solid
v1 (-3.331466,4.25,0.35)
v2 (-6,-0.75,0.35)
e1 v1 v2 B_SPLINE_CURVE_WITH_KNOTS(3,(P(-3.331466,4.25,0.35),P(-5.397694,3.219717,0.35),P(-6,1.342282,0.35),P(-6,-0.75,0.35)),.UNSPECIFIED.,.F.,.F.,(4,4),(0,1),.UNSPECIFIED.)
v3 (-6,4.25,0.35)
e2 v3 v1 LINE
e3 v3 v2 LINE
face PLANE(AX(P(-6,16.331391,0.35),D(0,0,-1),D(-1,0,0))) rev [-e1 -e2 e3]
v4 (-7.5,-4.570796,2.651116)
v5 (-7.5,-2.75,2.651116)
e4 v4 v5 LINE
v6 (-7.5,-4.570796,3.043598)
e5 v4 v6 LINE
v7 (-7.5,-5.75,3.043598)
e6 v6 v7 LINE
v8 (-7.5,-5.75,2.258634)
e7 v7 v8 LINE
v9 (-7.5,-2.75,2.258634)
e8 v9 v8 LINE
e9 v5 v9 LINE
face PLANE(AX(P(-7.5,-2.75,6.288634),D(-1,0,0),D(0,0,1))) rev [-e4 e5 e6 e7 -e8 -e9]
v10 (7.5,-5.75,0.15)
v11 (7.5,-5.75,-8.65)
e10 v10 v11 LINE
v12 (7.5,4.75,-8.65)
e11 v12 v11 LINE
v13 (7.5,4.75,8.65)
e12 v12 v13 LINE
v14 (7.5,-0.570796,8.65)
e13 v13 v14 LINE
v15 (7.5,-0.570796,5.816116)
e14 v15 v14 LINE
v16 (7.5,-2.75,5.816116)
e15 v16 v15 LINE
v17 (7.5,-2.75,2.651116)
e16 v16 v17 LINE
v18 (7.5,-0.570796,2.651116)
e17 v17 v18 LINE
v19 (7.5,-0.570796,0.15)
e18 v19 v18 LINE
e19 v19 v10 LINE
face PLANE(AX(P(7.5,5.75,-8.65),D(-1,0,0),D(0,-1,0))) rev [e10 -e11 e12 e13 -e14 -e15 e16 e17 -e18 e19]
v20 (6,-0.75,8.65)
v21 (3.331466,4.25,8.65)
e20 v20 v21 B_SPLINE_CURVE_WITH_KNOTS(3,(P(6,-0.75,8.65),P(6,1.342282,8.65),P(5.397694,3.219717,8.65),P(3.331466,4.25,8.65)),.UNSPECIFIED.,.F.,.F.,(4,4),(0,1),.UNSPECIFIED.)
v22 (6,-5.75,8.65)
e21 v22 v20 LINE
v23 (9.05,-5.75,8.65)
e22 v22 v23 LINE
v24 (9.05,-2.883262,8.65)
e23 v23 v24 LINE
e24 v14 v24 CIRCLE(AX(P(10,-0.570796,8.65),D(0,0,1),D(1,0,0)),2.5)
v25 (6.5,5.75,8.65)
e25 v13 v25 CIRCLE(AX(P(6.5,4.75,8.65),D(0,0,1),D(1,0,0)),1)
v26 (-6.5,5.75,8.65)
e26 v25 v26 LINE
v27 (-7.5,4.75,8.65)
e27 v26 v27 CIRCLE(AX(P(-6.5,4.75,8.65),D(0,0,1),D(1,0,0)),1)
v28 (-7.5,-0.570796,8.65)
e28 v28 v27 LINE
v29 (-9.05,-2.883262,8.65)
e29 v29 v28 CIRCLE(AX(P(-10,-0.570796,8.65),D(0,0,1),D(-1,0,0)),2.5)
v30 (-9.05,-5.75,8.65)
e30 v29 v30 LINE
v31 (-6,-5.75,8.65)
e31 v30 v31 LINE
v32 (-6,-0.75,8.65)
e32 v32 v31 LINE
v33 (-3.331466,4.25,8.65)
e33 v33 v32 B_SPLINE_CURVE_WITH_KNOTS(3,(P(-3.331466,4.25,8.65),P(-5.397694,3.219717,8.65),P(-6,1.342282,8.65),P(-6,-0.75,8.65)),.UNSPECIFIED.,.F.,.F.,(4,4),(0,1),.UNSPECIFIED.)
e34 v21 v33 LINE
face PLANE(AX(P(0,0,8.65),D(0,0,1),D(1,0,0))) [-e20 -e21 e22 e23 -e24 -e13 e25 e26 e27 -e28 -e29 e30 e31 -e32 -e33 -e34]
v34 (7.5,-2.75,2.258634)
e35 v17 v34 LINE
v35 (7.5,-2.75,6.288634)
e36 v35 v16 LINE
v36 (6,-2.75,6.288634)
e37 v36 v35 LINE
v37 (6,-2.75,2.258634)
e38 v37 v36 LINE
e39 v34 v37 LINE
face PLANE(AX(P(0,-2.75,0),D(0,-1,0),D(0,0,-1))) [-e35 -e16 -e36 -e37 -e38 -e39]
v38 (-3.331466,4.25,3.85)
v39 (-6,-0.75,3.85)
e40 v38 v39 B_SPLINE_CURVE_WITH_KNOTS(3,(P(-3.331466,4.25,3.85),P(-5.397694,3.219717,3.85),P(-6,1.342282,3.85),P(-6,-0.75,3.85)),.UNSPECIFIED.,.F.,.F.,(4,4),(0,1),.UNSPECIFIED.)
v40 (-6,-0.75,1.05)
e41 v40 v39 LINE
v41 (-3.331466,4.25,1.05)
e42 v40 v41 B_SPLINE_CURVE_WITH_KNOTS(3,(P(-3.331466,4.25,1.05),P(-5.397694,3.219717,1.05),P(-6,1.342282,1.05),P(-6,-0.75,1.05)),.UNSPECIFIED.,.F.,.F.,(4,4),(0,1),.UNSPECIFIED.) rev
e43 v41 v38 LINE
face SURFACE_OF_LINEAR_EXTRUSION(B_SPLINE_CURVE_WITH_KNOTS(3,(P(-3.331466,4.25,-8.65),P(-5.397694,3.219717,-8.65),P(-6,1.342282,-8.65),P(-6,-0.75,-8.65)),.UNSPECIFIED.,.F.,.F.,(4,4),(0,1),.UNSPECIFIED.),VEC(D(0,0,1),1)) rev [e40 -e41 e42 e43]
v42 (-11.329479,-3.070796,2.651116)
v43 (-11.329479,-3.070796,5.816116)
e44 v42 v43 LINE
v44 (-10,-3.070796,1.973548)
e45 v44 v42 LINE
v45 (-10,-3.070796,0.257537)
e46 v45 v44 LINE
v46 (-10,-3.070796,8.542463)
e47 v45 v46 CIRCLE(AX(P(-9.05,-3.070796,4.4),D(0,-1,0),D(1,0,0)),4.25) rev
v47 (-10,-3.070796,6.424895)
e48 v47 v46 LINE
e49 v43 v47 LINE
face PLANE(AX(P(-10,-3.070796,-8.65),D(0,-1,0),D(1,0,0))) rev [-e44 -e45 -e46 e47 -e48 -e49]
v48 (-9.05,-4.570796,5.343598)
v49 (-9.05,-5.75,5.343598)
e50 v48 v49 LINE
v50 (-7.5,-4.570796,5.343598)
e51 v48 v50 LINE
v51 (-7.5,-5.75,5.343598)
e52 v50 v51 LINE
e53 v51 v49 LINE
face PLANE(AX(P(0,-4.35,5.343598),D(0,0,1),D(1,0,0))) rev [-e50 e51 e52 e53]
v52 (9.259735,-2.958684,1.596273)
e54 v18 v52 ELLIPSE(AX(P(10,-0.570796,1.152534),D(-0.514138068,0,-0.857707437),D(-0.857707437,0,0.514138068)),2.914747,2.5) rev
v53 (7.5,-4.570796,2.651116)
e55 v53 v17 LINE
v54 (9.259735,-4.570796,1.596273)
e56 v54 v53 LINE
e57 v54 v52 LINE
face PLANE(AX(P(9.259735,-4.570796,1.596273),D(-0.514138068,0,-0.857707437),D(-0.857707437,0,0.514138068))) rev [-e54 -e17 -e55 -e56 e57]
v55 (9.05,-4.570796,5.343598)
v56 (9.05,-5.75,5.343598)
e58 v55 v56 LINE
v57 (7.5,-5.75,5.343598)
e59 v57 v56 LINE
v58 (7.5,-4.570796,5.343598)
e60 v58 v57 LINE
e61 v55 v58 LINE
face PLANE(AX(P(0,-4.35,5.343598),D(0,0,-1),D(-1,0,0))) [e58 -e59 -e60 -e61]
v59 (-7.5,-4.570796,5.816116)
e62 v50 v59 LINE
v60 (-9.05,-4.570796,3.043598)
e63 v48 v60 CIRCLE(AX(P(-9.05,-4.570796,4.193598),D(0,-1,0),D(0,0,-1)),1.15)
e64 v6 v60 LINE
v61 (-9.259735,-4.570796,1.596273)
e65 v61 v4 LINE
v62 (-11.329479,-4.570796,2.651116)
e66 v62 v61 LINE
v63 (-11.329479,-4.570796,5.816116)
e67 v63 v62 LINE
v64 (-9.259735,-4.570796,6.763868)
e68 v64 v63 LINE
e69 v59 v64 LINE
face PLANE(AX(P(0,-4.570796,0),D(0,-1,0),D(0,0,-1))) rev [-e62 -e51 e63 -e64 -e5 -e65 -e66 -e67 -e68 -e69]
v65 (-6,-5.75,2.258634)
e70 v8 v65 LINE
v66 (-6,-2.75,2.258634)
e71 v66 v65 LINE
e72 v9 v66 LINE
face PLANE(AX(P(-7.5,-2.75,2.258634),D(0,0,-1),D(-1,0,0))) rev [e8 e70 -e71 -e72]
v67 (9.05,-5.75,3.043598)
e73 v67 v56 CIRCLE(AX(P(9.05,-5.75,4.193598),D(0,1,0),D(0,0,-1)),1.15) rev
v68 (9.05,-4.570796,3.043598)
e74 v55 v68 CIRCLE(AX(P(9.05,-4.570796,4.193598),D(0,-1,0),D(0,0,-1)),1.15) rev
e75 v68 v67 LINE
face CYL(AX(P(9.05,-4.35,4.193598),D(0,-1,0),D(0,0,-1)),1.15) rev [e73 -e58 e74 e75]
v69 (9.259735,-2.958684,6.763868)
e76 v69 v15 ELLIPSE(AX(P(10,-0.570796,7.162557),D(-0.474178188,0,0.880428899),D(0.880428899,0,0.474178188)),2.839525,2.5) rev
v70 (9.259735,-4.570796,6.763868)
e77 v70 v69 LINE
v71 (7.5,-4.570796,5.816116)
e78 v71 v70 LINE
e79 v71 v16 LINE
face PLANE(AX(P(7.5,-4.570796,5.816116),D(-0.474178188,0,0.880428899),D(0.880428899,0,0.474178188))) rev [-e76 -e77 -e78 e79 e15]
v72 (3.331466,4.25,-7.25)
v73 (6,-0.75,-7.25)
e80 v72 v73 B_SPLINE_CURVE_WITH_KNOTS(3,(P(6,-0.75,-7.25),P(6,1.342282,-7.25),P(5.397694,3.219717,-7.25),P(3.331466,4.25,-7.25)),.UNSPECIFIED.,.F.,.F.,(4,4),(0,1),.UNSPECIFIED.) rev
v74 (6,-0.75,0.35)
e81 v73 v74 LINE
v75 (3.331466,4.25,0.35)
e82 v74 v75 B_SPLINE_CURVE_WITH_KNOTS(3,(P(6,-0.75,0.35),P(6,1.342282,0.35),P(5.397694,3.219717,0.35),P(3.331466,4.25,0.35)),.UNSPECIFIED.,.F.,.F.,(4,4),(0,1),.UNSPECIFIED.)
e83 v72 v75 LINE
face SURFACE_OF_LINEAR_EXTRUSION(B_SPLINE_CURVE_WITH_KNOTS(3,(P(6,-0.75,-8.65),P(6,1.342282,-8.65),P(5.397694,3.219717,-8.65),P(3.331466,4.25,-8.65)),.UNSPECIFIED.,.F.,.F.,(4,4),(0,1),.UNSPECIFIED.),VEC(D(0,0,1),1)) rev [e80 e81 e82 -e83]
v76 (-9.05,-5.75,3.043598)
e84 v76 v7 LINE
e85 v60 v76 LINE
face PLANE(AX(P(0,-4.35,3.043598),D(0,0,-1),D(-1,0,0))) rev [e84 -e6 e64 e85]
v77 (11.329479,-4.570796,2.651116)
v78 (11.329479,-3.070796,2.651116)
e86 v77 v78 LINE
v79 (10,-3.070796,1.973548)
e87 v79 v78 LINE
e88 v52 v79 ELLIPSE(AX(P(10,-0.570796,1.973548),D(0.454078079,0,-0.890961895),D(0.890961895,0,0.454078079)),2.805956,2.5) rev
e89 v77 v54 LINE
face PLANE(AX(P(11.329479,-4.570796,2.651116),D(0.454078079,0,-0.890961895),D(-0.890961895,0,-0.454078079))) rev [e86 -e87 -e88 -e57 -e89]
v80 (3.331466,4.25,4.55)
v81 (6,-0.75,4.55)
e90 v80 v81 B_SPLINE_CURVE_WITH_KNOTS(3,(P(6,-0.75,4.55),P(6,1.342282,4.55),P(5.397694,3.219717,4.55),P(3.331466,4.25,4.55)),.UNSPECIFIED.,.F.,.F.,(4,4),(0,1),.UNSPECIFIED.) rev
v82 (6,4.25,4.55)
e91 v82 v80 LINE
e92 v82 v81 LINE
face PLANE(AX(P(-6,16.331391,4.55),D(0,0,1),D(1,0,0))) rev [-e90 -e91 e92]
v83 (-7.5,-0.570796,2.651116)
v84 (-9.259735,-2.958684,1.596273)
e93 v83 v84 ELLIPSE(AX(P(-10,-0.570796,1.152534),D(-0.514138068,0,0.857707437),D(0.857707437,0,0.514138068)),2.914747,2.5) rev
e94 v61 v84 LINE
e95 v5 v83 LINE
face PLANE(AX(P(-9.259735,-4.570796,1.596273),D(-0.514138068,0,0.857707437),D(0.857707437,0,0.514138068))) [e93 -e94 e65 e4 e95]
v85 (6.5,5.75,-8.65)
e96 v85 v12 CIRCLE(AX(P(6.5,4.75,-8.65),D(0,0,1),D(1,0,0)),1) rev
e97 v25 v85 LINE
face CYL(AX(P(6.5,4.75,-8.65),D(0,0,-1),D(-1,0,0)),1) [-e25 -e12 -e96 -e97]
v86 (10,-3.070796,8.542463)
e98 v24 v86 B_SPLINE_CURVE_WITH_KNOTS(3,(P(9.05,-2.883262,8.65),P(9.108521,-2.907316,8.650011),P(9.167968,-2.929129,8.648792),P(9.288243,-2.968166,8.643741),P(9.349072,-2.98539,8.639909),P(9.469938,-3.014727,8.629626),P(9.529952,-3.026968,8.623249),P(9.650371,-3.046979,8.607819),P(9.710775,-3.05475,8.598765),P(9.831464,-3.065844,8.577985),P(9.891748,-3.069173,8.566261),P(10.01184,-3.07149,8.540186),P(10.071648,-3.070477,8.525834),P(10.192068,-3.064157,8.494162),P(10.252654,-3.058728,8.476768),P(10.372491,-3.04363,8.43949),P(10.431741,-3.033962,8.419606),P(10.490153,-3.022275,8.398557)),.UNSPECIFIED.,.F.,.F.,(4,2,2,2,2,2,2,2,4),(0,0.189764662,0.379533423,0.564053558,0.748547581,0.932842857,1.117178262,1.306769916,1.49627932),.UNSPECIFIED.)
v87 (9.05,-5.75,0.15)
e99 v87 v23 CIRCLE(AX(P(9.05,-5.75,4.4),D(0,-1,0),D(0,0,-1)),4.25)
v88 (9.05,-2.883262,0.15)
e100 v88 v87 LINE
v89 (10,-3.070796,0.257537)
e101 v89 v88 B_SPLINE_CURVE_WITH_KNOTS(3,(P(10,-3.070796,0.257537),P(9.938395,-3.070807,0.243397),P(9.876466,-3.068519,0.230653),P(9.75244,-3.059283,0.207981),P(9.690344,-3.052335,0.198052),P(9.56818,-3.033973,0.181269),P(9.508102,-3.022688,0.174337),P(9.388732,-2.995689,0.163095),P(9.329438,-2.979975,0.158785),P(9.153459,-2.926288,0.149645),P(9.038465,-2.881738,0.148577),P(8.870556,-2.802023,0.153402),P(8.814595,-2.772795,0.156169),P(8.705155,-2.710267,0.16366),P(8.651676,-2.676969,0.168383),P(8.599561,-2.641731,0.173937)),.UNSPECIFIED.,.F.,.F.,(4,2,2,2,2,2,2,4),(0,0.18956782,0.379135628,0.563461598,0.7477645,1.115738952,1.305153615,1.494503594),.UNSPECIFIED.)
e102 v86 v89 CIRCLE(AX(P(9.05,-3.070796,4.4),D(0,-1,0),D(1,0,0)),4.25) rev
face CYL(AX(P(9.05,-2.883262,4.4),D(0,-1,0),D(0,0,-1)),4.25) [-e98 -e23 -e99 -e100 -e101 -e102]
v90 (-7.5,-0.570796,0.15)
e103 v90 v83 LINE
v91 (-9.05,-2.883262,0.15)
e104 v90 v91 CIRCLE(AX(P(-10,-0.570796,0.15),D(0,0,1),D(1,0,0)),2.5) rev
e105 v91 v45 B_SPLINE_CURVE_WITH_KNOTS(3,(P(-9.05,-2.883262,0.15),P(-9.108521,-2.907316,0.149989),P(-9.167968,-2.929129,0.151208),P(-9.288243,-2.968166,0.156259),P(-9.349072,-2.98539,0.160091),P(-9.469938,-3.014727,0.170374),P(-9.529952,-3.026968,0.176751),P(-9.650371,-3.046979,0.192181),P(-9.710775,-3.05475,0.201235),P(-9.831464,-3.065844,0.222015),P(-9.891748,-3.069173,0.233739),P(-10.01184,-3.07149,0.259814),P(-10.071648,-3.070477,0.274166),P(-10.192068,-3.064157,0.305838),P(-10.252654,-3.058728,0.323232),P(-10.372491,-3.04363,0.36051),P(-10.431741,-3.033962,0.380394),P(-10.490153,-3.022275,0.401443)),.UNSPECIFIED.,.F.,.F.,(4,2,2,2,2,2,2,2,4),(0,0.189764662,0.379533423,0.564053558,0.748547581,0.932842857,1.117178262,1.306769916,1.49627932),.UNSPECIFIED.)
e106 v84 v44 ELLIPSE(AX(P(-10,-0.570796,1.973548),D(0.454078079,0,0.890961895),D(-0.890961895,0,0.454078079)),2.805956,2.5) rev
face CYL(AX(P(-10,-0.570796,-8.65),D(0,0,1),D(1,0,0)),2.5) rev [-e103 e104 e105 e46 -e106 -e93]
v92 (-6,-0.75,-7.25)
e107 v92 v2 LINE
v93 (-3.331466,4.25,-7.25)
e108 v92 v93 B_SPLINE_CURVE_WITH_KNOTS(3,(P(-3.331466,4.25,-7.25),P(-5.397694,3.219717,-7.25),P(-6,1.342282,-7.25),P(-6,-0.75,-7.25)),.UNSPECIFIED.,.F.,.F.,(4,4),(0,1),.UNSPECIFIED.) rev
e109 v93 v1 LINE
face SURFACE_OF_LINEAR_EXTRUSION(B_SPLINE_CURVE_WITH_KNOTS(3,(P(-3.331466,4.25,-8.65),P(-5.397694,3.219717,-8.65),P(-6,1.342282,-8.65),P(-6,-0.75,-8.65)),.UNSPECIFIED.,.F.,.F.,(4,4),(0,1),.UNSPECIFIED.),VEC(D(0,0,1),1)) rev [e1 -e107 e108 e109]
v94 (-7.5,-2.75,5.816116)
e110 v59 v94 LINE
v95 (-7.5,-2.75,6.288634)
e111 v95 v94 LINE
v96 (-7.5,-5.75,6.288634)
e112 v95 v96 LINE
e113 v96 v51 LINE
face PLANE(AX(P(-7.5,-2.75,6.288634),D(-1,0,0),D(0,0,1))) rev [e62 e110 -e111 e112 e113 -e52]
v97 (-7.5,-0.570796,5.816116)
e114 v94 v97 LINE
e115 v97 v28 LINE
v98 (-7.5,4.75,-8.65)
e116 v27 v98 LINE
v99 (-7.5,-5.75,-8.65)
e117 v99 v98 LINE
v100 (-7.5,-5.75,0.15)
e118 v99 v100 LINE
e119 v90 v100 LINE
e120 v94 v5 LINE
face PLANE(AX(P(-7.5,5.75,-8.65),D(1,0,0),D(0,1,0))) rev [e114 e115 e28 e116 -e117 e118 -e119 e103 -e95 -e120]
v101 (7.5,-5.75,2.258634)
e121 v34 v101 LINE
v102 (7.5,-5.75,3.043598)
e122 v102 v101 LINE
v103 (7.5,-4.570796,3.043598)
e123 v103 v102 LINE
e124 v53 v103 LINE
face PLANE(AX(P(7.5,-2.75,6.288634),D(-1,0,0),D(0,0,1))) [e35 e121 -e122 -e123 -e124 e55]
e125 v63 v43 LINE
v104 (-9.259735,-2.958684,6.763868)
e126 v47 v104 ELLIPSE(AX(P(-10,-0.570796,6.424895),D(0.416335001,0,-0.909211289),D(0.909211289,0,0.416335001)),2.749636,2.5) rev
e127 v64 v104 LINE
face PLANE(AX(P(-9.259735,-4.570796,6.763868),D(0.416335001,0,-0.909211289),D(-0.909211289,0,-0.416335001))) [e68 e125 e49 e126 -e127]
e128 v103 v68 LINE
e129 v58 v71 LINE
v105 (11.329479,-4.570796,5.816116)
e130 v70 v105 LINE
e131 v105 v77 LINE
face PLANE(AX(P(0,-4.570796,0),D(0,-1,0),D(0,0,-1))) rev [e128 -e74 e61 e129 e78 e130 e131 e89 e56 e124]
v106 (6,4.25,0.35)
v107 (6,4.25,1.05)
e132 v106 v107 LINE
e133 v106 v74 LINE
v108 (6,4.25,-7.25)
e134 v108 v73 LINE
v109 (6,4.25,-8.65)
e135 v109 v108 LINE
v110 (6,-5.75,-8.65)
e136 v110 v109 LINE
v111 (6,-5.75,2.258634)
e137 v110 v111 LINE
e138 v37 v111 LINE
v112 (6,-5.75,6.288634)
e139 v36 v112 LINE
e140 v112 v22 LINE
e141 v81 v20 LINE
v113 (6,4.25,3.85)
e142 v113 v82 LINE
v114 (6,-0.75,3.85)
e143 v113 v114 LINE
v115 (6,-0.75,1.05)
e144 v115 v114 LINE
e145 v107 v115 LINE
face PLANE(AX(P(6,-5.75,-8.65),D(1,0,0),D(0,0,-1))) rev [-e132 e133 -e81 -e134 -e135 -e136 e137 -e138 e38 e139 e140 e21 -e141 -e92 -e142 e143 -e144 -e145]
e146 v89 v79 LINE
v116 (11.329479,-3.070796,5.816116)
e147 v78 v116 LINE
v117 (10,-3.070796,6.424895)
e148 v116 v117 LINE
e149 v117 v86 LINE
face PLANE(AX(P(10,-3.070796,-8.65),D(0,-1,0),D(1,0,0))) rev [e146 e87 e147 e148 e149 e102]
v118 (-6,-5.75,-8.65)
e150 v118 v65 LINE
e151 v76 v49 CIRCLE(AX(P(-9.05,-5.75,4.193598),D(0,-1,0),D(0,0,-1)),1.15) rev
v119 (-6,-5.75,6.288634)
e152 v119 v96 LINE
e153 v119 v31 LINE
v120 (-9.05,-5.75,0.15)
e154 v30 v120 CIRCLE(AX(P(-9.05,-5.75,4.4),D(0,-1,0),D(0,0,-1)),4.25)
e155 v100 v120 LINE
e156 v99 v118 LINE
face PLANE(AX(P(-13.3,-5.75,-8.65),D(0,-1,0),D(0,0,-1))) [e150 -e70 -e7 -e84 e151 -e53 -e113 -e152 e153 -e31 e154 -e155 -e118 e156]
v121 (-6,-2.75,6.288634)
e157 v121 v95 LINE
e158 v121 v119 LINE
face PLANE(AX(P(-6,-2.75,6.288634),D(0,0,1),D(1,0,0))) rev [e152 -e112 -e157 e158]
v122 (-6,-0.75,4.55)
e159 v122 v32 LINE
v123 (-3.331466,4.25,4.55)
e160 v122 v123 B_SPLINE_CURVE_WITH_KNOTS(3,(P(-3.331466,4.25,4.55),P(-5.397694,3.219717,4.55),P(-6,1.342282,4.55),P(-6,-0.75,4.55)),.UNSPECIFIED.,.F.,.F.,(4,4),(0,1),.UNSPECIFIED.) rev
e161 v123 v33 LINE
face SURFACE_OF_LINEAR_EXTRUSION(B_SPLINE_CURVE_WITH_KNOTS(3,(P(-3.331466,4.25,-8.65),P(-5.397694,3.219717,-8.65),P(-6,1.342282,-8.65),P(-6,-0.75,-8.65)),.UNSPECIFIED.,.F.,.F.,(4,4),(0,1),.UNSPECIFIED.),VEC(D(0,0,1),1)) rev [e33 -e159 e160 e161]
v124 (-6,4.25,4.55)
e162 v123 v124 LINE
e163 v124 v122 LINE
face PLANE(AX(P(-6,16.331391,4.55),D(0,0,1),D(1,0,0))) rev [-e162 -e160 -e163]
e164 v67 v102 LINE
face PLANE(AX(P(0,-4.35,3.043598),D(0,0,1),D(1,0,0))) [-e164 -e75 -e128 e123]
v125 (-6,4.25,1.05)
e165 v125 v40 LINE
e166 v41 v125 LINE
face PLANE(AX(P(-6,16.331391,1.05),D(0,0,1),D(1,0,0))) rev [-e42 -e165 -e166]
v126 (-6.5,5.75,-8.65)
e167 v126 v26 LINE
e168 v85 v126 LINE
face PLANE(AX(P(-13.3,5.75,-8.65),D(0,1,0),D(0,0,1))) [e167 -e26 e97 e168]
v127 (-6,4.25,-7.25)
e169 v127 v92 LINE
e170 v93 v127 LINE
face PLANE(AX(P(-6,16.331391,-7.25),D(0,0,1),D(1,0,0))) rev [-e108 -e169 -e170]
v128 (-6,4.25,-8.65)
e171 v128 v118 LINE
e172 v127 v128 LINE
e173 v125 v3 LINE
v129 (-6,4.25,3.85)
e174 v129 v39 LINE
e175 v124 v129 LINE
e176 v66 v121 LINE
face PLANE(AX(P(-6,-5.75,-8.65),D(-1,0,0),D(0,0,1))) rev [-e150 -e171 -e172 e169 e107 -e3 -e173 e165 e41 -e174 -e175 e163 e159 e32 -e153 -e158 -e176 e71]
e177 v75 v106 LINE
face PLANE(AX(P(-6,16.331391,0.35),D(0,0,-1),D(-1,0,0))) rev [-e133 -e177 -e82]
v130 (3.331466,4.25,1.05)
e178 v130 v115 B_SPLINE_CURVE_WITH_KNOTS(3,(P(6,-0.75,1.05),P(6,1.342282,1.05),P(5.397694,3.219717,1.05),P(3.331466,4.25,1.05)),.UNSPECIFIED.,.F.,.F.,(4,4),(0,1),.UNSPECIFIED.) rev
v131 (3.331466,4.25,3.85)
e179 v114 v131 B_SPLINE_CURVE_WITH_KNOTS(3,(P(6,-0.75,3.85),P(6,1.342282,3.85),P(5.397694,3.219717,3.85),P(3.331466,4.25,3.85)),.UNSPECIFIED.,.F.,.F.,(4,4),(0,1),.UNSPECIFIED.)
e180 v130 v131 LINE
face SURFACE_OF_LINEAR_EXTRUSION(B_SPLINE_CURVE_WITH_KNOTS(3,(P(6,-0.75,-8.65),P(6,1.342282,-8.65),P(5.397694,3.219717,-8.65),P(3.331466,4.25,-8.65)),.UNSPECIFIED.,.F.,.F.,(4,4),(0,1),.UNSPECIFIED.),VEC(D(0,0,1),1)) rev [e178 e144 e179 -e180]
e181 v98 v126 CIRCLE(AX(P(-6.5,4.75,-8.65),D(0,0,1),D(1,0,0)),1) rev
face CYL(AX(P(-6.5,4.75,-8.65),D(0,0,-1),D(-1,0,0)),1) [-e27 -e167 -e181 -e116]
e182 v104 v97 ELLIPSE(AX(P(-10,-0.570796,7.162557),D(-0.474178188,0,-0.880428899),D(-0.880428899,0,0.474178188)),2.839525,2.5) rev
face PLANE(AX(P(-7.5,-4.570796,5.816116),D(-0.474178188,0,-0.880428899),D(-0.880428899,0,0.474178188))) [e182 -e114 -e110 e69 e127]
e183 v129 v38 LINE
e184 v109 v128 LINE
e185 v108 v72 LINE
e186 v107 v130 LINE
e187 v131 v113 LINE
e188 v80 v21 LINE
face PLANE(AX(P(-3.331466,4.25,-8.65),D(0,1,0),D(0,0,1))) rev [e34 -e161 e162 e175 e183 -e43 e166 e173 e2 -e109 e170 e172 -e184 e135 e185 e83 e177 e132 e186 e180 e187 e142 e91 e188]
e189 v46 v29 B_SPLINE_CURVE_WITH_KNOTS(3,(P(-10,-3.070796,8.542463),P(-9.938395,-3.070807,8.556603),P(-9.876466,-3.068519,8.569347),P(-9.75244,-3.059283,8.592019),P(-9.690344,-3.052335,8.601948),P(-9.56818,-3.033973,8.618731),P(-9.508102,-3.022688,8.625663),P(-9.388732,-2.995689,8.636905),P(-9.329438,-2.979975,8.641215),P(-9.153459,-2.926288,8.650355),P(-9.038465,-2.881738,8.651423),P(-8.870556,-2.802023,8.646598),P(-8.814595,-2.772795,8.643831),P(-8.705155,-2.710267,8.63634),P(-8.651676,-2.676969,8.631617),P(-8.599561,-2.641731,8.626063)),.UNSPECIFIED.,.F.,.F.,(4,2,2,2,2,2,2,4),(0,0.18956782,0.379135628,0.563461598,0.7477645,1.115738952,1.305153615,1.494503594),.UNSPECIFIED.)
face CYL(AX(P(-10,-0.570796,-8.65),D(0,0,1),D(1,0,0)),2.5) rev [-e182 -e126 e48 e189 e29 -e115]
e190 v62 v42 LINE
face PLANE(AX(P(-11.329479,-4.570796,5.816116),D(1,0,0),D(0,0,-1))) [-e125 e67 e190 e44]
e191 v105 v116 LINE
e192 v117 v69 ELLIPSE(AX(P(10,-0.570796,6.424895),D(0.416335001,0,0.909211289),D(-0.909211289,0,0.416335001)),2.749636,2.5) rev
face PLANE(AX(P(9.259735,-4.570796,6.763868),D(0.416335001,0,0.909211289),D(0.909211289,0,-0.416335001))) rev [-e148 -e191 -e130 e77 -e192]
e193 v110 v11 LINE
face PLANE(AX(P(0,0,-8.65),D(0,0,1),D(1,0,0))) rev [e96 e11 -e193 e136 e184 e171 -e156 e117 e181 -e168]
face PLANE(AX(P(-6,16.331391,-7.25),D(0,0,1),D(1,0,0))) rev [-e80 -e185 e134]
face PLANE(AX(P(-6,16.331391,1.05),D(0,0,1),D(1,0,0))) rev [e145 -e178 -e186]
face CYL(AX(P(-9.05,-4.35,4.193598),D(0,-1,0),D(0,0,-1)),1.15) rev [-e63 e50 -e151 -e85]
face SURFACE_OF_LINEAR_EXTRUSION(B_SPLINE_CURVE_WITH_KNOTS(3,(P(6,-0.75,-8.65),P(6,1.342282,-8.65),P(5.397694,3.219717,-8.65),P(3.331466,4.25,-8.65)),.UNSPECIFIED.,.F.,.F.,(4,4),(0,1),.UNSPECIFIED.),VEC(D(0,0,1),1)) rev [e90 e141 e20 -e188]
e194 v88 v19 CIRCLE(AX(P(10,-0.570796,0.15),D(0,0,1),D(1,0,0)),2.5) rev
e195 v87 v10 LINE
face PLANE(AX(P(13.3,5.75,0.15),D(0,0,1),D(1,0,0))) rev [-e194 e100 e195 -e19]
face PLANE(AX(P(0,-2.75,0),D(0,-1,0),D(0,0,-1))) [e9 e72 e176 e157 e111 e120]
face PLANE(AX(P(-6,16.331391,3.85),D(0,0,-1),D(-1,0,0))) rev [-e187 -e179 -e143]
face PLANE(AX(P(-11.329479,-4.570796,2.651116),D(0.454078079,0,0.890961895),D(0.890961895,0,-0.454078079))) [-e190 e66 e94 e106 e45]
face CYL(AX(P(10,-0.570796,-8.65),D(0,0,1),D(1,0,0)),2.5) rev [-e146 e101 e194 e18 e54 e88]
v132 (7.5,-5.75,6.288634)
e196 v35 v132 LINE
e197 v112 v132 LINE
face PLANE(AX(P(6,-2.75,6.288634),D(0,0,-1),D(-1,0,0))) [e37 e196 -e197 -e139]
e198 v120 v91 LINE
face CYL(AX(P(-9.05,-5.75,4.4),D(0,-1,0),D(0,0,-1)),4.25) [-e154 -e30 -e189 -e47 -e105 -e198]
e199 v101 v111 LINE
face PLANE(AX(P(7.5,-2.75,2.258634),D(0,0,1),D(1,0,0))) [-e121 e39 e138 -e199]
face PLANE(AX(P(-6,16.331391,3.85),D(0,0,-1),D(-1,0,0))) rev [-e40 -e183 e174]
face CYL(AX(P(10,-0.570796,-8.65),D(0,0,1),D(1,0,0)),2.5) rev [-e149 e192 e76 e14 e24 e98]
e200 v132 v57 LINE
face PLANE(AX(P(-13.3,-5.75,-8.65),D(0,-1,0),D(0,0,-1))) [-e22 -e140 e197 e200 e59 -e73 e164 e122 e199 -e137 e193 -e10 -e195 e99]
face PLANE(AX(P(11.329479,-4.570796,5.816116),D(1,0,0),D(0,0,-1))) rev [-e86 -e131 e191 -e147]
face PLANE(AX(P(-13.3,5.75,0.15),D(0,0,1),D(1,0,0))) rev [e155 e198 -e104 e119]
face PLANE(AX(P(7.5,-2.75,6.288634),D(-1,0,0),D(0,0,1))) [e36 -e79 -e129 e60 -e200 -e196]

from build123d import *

# Parameters (mm, degrees)
BOSS_EXTRUDE1_DEPTH      = 8.65
BOSS_EXTRUDE1_DEPTH_BACK = 8.65
SKETCH2_W                = 26.6
SKETCH2_H                = 11.5
CUT_EXTRUDE1_DEPTH       = 23.566402017
SKETCH4_W                = 5.8
SKETCH4_H                = 8.8
CUT_EXTRUDE2_DEPTH       = 20.594961087
SKETCH5_W                = 1.5
SKETCH5_H                = 4.03
CUT_EXTRUDE3_DEPTH       = 3
CUT_EXTRUDE4_DEPTH       = 1.4
CUT_EXTRUDE5_START       = -5.1792
CUT_EXTRUDE5_DEPTH       = 4
FILLET3_START            = -7
FILLET3_DEPTH            = 6.429203884
FILLET4_START            = -7
FILLET4_DEPTH            = 6.429203884
CUT_EXTRUDE6_DEPTH       = 23.566402102
FILLET5_R                = 1
SKETCH12_W               = 12
SKETCH12_H               = 1.4
SKETCH12_H_2             = 0.7
CUT_EXTRUDE7_DEPTH       = 10


with BuildPart() as part:
    # Sketch2 → Boss-Extrude1 (new, two sides: drawn at the far end of the back side and taken through both)
    with BuildSketch(Plane.XY.offset(-BOSS_EXTRUDE1_DEPTH_BACK)):
        Rectangle(SKETCH2_W, SKETCH2_H)
    extrude(amount=BOSS_EXTRUDE1_DEPTH + BOSS_EXTRUDE1_DEPTH_BACK)

    # Sketch3 → Cut-Extrude1 (cut, through all)
    with BuildSketch(Plane.XY.offset(8.65)):
        with BuildLine():
            Line((-7.5, 5.75), (-7.5, -0.570796116))
            ThreePointArc((-7.5, -0.570796116), (-8.232233047, -2.338563069), (-10, -3.070796116))
            Line((-10, -3.070796116), (-13.3, -3.070796116))
            Line((-13.3, -3.070796116), (-13.3, 5.75))
            Line((-13.3, 5.75), (-7.5, 5.75))
        make_face()
        with BuildLine():
            Line((7.5, 5.75), (7.5, -0.570796116))
            ThreePointArc((7.5, -0.570796116), (8.232233047, -2.338563069), (10, -3.070796116))
            Line((10, -3.070796116), (13.3, -3.070796116))
            Line((13.3, -3.070796116), (13.3, 5.75))
            Line((13.3, 5.75), (7.5, 5.75))
        make_face()
    extrude(amount=-CUT_EXTRUDE1_DEPTH, mode=Mode.SUBTRACT)

    # Sketch4 → Cut-Extrude2 (cut, through all)
    with BuildSketch(Plane.XZ.offset(5.75)):
        with Locations((-10.4, -4.25)):
            Rectangle(SKETCH4_W, SKETCH4_H)
        with Locations((10.4, -4.25)):
            Rectangle(SKETCH4_W, SKETCH4_H)
    extrude(amount=-CUT_EXTRUDE2_DEPTH, mode=Mode.SUBTRACT)

    # Sketch5 → Cut-Extrude3 (cut)
    with BuildSketch(Plane.XZ.offset(5.75)):
        with Locations((-6.75, 4.27363419)):
            Rectangle(SKETCH5_W, SKETCH5_H)
    cut_extrude3 = extrude(amount=-CUT_EXTRUDE3_DEPTH, mode=Mode.SUBTRACT)

    # Sketch5<3> → Cut-Extrude4 (cut)
    with BuildSketch(Plane.XZ.offset(5.75)):
        with BuildLine():
            ThreePointArc((-9.05, 3.04359822), (-10.2, 4.19359822), (-9.05, 5.34359822))
            Line((-9.05, 5.34359822), (-7.5, 5.34359822))
            Line((-7.5, 5.34359822), (-7.5, 3.04359822))
            Line((-7.5, 3.04359822), (-9.05, 3.04359822))
        make_face()
    cut_extrude4 = extrude(amount=-CUT_EXTRUDE4_DEPTH, mode=Mode.SUBTRACT)

    # Sketch8 → Cut-Extrude5 (cut)
    with BuildSketch(Plane.XZ.offset(5.75).offset(CUT_EXTRUDE5_START)):
        Polygon((-11.329479063, 5.816116205), (-11.329479063, 2.651116205), (-9.259735425, 1.596272871), (-7.5, 2.651116205), (-7.5, 5.816116205), (-9.259735425, 6.763868097), align=None)
    cut_extrude5 = extrude(amount=CUT_EXTRUDE5_DEPTH, mode=Mode.SUBTRACT)

    # Fillet3: read off the stored shape, not the designer's step
    # Fillet3 outline → Fillet3 (cut)
    with BuildSketch(Plane(origin=(0, 0, 0), x_dir=(1, 0, 0), z_dir=(0, 1, 0)).offset(FILLET3_START)):
        with BuildLine():
            Line((-13.3, -8.65), (-9.05, -8.65))
            ThreePointArc((-9.05, -8.65), (-12.05520382, -7.40520382), (-13.3, -4.4))
            Line((-13.3, -4.4), (-13.3, -8.65))
        make_face()
        with BuildLine():
            Line((-13.3, -0.15), (-13.3, -4.4))
            ThreePointArc((-13.3, -4.4), (-12.05520382, -1.39479618), (-9.05, -0.15))
            Line((-9.05, -0.15), (-13.3, -0.15))
        make_face()
    extrude(amount=FILLET3_DEPTH, mode=Mode.SUBTRACT)

    # Mirror4: Cut-Extrude3, Cut-Extrude4, Cut-Extrude5 across plane
    add(cut_extrude3.mirror(Plane(origin=(0, 0, 0), x_dir=(0, 0, 1), z_dir=(1, 0, 0))), mode=Mode.SUBTRACT)
    add(cut_extrude4.mirror(Plane(origin=(0, 0, 0), x_dir=(0, 0, 1), z_dir=(1, 0, 0))), mode=Mode.SUBTRACT)
    add(cut_extrude5.mirror(Plane(origin=(0, 0, 0), x_dir=(0, 0, 1), z_dir=(1, 0, 0))), mode=Mode.SUBTRACT)

    # Fillet4: read off the stored shape, not the designer's step
    # Fillet4 outline → Fillet4 (cut)
    with BuildSketch(Plane(origin=(0, 0, 0), x_dir=(1, 0, 0), z_dir=(0, 1, 0)).offset(FILLET4_START)):
        with BuildLine():
            Line((13.3, -0.15), (9.05, -0.15))
            ThreePointArc((9.05, -0.15), (12.05520382, -1.39479618), (13.3, -4.4))
            Line((13.3, -4.4), (13.3, -0.15))
        make_face()
        with BuildLine():
            Line((13.3, -8.65), (13.3, -4.4))
            ThreePointArc((13.3, -4.4), (12.05520382, -7.40520382), (9.049999999, -8.65))
            Line((9.049999999, -8.65), (13.3, -8.65))
        make_face()
    extrude(amount=FILLET4_DEPTH, mode=Mode.SUBTRACT)

    # Sketch10 → Cut-Extrude6 (cut, through all)
    with BuildSketch(Plane.XY.offset(8.65)):
        with BuildLine():
            Line((-6, -5.75), (6, -5.75))
            Line((6, -5.75), (6, -0.75))
            add(Edge.make_bspline(
                [(6, -0.75), (6, 1.34228193), (5.397693539, 3.219717328), (3.331465755, 4.25)],
                knots=[0, 0, 0, 0, 1, 1, 1, 1], degree=3))
            Line((3.331465755, 4.25), (3.297244701, 4.25))
            Line((3.297244701, 4.25), (-3.331465755, 4.25))
            add(Edge.make_bspline(
                [(-6, -0.75), (-6, 1.34228193), (-5.397693539, 3.219717328), (-3.331465755, 4.25)],
                knots=[0, 0, 0, 0, 1, 1, 1, 1], degree=3))
            Line((-6, -0.75), (-6, -5.75))
        make_face()
    extrude(amount=-CUT_EXTRUDE6_DEPTH, mode=Mode.SUBTRACT)

    # Fillet5
    fillet5_edges = [part.edges().sort_by_distance(p)[0] for p in [
        (-7.5, 5.75, 0),
        (7.5, 5.75, 0),
    ]]
    fillet(fillet5_edges, radius=FILLET5_R)

    # Sketch12 → Cut-Extrude7 (cut)
    with BuildSketch(Plane.XZ.offset(5.75)):
        with Locations((0, -7.95)):
            Rectangle(SKETCH12_W, SKETCH12_H)
        with Locations((0, 0.7)):
            Rectangle(SKETCH12_W, SKETCH12_H_2)
        with Locations((0, 4.2)):
            Rectangle(SKETCH12_W, SKETCH12_H_2)
    extrude(amount=-CUT_EXTRUDE7_DEPTH, mode=Mode.SUBTRACT)


solid = part.part
